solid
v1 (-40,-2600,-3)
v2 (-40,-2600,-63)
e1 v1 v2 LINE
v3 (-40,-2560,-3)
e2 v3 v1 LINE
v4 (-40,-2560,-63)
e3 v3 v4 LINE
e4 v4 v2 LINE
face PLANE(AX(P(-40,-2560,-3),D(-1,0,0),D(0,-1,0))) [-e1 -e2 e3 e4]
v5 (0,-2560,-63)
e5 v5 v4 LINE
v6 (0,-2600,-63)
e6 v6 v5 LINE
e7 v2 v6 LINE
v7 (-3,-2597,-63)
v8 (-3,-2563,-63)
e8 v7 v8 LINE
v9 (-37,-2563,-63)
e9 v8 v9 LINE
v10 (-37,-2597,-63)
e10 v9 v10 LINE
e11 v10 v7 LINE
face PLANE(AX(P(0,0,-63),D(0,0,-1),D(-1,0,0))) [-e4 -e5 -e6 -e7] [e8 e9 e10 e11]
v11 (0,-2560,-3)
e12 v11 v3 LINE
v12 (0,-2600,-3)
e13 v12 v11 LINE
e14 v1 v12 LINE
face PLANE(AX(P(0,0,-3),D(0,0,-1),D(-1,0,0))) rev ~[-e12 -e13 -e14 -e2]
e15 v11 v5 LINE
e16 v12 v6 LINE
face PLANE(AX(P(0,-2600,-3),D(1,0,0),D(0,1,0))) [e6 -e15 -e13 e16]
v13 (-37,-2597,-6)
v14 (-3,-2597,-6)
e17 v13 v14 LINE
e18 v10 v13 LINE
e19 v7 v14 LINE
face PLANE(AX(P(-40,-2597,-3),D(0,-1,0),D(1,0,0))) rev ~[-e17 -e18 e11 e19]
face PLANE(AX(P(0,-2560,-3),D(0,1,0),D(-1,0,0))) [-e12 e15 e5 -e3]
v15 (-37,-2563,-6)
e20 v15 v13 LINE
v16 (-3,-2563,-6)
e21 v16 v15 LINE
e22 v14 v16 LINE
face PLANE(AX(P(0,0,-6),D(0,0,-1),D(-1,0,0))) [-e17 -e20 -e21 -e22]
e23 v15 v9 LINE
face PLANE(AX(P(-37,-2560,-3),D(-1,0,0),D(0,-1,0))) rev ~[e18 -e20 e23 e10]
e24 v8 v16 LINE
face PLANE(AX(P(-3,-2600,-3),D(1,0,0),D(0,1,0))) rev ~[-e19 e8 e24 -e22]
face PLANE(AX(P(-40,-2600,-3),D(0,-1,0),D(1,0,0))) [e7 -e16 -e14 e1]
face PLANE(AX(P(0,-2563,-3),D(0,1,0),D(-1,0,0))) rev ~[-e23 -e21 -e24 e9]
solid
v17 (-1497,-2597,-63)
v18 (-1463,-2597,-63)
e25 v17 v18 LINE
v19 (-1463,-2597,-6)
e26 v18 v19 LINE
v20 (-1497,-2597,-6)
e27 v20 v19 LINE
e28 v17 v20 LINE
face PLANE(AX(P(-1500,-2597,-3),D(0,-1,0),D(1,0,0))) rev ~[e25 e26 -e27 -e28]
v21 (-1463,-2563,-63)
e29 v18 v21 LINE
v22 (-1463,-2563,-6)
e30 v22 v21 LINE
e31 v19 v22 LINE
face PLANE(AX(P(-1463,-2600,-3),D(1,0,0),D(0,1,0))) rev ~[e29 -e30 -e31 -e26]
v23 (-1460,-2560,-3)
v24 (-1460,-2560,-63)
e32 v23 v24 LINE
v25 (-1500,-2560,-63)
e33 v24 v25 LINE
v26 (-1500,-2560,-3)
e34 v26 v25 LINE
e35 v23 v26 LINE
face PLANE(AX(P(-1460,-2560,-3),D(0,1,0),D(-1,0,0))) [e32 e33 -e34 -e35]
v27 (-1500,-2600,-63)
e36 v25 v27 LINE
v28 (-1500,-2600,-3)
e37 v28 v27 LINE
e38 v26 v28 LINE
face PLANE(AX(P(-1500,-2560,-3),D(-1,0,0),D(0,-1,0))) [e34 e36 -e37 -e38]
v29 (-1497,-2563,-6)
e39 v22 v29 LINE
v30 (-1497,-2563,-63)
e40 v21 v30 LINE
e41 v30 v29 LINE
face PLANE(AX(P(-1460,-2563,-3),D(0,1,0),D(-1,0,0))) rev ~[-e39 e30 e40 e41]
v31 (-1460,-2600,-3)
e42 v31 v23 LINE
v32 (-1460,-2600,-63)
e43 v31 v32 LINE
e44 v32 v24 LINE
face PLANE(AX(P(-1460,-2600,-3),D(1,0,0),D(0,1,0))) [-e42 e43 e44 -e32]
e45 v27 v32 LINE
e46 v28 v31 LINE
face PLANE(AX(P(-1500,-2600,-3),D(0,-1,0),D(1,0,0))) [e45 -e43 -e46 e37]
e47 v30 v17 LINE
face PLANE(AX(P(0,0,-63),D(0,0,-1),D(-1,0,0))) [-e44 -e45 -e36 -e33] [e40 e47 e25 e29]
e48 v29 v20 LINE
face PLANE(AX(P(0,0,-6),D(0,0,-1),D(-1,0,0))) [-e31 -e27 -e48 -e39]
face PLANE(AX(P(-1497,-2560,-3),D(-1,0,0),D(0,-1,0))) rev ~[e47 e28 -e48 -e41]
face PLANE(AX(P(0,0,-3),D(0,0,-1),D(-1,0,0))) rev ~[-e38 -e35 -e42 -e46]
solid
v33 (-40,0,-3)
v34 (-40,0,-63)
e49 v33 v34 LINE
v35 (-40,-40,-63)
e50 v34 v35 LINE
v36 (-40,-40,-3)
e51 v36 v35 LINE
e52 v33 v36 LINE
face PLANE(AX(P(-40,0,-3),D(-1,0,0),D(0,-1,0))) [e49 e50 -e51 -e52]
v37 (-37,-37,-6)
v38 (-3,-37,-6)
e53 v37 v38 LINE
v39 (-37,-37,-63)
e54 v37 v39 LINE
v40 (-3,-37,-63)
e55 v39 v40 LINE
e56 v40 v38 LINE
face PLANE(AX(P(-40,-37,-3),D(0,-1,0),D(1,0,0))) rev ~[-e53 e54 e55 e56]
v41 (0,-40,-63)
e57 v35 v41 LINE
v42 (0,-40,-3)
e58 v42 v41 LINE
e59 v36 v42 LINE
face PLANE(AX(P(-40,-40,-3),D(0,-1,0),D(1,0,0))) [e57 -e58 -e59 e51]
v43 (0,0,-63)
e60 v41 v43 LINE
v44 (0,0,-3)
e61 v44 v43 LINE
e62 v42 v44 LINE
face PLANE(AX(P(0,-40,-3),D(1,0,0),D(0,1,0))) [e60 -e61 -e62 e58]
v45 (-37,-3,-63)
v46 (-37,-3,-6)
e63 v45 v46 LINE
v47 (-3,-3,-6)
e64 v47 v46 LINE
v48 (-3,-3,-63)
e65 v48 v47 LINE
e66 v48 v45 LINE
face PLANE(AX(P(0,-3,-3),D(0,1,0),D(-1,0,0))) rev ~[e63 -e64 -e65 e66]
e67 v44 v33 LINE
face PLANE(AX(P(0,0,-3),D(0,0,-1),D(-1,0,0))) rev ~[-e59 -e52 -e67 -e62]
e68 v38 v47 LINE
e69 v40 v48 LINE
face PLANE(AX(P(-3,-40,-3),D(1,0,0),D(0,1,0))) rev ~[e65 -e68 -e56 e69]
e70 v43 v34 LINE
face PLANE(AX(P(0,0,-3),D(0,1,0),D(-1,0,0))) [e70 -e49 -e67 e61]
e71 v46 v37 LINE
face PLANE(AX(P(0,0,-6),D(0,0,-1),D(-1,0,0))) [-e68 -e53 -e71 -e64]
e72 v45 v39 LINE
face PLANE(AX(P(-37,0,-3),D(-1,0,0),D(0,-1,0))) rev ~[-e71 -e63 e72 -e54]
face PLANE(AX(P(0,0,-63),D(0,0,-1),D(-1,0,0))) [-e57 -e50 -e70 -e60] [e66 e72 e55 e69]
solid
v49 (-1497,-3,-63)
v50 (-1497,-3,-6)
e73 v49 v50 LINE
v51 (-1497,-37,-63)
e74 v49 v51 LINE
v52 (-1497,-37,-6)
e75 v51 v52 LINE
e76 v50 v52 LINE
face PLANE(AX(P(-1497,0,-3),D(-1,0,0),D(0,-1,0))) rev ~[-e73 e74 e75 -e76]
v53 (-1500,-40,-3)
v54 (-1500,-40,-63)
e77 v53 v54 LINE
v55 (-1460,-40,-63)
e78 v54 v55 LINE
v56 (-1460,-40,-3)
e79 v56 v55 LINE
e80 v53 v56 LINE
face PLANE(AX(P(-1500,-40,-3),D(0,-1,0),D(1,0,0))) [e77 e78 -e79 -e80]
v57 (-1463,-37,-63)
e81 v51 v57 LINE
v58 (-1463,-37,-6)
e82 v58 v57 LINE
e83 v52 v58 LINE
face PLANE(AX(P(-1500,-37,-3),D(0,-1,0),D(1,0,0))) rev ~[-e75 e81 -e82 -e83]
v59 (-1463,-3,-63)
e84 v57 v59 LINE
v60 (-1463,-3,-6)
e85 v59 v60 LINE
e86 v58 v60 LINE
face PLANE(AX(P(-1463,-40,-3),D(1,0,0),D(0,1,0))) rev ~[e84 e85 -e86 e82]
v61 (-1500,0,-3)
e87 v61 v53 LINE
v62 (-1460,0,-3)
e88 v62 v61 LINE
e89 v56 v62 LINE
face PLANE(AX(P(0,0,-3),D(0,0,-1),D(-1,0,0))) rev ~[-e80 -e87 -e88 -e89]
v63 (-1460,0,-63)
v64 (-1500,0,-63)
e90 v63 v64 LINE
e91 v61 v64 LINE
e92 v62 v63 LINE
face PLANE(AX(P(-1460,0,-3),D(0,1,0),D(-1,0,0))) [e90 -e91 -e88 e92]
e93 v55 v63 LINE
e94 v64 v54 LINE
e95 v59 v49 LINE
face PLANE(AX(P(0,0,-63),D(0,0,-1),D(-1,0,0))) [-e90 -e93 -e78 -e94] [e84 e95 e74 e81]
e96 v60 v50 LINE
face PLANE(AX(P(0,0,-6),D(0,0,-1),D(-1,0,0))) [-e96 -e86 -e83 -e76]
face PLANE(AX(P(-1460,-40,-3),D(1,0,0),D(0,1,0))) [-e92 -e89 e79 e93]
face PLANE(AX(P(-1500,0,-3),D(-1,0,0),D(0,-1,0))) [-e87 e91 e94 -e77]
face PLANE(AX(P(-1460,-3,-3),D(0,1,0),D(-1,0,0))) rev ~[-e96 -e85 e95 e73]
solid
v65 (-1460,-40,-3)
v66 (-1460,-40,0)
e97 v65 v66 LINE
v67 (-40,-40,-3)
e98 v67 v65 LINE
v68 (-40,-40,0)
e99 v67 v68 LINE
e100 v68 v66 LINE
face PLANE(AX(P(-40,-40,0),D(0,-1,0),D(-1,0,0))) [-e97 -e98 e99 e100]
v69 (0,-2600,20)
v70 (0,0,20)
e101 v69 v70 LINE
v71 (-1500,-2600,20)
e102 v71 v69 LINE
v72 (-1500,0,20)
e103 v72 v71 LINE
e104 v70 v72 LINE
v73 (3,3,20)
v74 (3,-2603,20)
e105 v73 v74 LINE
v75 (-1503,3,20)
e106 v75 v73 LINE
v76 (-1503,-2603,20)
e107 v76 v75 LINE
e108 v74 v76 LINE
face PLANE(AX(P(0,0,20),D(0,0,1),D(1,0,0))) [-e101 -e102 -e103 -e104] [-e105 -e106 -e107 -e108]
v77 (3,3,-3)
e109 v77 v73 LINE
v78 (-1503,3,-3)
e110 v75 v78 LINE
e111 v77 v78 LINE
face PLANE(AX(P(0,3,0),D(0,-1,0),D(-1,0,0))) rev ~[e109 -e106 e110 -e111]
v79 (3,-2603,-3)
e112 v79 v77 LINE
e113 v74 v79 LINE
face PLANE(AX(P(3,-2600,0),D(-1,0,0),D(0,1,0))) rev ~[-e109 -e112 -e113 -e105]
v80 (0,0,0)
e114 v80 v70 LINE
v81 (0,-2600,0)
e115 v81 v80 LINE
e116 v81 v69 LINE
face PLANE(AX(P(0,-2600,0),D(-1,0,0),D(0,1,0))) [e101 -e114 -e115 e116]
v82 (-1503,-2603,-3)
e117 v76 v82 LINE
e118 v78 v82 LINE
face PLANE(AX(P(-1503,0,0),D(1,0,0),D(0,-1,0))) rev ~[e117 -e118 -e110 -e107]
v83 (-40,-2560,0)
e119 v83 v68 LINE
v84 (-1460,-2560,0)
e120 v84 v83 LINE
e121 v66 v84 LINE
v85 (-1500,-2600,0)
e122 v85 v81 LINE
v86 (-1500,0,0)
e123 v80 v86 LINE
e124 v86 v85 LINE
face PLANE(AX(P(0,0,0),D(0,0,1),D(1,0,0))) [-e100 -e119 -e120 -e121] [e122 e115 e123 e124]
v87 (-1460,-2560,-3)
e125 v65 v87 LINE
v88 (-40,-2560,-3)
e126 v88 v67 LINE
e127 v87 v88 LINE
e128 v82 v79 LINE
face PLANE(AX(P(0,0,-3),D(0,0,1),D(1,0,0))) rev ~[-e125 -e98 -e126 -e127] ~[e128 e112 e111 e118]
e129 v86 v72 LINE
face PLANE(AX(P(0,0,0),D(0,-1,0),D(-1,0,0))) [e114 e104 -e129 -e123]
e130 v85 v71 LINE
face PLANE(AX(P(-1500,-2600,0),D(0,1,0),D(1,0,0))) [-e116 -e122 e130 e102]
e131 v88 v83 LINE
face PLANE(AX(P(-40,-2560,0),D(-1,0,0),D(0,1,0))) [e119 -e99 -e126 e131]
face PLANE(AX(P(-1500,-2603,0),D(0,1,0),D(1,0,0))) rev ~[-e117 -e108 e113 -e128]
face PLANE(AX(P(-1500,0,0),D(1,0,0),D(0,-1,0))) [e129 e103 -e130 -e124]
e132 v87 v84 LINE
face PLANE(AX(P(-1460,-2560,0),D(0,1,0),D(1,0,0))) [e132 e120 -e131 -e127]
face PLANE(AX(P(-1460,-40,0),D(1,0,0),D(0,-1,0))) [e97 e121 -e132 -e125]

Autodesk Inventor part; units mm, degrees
ref_plane "YZ Plane" through (0, 0, 0) normal (1, 0, 0) x (0, 1, 0)
ref_plane "XZ Plane" through (0, 0, 0) normal (0, 1, 0) x (-1, 0, 0)
ref_plane "XY Plane" through (0, 0, 0) normal (0, 0, 1) x (1, 0, 0)
sketch "Sketch1" plane through (0, 0, 0) normal (0, 0, 1) x (1, 0, 0)
  line L0 (0, 0) -> (-1500, 0)
  line L1 (-1500, 0) -> (-1500, -2600)
  line L2 (-1500, -2600) -> (0, -2600)
  line L3 (0, -2600) -> (0, 0)
  line L4 (-40, -40) -> (-1460, -40)
  line L5 (-1460, -40) -> (-1460, -2560)
  line L6 (-1460, -2560) -> (-40, -2560)
  line L7 (-40, -2560) -> (-40, -40)
  dimension "d0" = 1500
  dimension "d1" = 2600
  dimension "d2" = 40
extrude "Extrusion1" add sketch "Sketch1" along normal blind 20
shell "Shell1" thickness 3 outward yes removed faces 5 at (-1486.6667, -880, 20) at (-1460, -1720, 6.6667) at (-40, -880, 6.6667) at (-513.3333, -2560, 13.3333) at (-986.6667, -40, 13.3333)
sketch "Sketch2" plane through (0, 0, -3) normal (0, 0, -1) x (-1, 0, 0)
  line L0 (1503, 3) -> (1503, -2603) projected
  line L1 (-3, 3) -> (1503, 3) projected
  line L2 (-3, -2603) -> (-3, 3) projected
  line L3 (1503, -2603) -> (-3, -2603) projected
  line L4 (40, -40) -> (40, -2560) projected
  line L5 (1460, -40) -> (40, -40) projected
  line L6 (1460, -2560) -> (1460, -40) projected
  line L7 (40, -2560) -> (1460, -2560) projected
  line L8 (1460, -2560) -> (1460, -40) projected
  line L9 (1500, -2600) -> (0, -2600) projected
  line L10 (1460, -2560) -> (1500, -2560)
  line L11 (1500, -2560) -> (1500, -2600)
  line L12 (1500, -2600) -> (1460, -2600)
  line L13 (1460, -2600) -> (1460, -2560)
  line L14 (0, -2600) -> (0, -2560)
  line L15 (40, -2560) -> (40, -2600)
  line L16 (40, -2600) -> (0, -2600)
  line L17 (0, -2560) -> (40, -2560)
  line L18 (1460, -40) -> (1460, 0)
  line L19 (1500, 0) -> (1500, -40)
  line L20 (1500, -40) -> (1460, -40)
  line L21 (1460, 0) -> (1500, 0)
  line L22 (0, -40) -> (0, 0)
  line L23 (40, 0) -> (40, -40)
  line L24 (40, -40) -> (0, -40)
  line L25 (0, 0) -> (40, 0)
  point P0 (0, 0)
  dimension "d8" = 1460
  dimension "d11" = 2560
extrude "Extrusion2" add sketch "Sketch2" along normal blind 60 separate body contours L18 L21 L19 L20 | L24 L22 L25 L23 | L15 L9 L14 L17 | L10 L11 L9 L13
shell "Shell2" thickness 3 removed faces 4 at (-1486.6667, -13.3333, -63) at (-1486.6667, -2573.3333, -63) at (-26.6667, -2573.3333, -63) at (-13.3333, -13.3333, -63) bodies 2
equation "\"d0\" = comprimento"
equation "\"d1\" = largura"
equation "\"comprimento\" = 1500"
equation "\"largura\" = 2600"
properties part number "estruturaMesa"
